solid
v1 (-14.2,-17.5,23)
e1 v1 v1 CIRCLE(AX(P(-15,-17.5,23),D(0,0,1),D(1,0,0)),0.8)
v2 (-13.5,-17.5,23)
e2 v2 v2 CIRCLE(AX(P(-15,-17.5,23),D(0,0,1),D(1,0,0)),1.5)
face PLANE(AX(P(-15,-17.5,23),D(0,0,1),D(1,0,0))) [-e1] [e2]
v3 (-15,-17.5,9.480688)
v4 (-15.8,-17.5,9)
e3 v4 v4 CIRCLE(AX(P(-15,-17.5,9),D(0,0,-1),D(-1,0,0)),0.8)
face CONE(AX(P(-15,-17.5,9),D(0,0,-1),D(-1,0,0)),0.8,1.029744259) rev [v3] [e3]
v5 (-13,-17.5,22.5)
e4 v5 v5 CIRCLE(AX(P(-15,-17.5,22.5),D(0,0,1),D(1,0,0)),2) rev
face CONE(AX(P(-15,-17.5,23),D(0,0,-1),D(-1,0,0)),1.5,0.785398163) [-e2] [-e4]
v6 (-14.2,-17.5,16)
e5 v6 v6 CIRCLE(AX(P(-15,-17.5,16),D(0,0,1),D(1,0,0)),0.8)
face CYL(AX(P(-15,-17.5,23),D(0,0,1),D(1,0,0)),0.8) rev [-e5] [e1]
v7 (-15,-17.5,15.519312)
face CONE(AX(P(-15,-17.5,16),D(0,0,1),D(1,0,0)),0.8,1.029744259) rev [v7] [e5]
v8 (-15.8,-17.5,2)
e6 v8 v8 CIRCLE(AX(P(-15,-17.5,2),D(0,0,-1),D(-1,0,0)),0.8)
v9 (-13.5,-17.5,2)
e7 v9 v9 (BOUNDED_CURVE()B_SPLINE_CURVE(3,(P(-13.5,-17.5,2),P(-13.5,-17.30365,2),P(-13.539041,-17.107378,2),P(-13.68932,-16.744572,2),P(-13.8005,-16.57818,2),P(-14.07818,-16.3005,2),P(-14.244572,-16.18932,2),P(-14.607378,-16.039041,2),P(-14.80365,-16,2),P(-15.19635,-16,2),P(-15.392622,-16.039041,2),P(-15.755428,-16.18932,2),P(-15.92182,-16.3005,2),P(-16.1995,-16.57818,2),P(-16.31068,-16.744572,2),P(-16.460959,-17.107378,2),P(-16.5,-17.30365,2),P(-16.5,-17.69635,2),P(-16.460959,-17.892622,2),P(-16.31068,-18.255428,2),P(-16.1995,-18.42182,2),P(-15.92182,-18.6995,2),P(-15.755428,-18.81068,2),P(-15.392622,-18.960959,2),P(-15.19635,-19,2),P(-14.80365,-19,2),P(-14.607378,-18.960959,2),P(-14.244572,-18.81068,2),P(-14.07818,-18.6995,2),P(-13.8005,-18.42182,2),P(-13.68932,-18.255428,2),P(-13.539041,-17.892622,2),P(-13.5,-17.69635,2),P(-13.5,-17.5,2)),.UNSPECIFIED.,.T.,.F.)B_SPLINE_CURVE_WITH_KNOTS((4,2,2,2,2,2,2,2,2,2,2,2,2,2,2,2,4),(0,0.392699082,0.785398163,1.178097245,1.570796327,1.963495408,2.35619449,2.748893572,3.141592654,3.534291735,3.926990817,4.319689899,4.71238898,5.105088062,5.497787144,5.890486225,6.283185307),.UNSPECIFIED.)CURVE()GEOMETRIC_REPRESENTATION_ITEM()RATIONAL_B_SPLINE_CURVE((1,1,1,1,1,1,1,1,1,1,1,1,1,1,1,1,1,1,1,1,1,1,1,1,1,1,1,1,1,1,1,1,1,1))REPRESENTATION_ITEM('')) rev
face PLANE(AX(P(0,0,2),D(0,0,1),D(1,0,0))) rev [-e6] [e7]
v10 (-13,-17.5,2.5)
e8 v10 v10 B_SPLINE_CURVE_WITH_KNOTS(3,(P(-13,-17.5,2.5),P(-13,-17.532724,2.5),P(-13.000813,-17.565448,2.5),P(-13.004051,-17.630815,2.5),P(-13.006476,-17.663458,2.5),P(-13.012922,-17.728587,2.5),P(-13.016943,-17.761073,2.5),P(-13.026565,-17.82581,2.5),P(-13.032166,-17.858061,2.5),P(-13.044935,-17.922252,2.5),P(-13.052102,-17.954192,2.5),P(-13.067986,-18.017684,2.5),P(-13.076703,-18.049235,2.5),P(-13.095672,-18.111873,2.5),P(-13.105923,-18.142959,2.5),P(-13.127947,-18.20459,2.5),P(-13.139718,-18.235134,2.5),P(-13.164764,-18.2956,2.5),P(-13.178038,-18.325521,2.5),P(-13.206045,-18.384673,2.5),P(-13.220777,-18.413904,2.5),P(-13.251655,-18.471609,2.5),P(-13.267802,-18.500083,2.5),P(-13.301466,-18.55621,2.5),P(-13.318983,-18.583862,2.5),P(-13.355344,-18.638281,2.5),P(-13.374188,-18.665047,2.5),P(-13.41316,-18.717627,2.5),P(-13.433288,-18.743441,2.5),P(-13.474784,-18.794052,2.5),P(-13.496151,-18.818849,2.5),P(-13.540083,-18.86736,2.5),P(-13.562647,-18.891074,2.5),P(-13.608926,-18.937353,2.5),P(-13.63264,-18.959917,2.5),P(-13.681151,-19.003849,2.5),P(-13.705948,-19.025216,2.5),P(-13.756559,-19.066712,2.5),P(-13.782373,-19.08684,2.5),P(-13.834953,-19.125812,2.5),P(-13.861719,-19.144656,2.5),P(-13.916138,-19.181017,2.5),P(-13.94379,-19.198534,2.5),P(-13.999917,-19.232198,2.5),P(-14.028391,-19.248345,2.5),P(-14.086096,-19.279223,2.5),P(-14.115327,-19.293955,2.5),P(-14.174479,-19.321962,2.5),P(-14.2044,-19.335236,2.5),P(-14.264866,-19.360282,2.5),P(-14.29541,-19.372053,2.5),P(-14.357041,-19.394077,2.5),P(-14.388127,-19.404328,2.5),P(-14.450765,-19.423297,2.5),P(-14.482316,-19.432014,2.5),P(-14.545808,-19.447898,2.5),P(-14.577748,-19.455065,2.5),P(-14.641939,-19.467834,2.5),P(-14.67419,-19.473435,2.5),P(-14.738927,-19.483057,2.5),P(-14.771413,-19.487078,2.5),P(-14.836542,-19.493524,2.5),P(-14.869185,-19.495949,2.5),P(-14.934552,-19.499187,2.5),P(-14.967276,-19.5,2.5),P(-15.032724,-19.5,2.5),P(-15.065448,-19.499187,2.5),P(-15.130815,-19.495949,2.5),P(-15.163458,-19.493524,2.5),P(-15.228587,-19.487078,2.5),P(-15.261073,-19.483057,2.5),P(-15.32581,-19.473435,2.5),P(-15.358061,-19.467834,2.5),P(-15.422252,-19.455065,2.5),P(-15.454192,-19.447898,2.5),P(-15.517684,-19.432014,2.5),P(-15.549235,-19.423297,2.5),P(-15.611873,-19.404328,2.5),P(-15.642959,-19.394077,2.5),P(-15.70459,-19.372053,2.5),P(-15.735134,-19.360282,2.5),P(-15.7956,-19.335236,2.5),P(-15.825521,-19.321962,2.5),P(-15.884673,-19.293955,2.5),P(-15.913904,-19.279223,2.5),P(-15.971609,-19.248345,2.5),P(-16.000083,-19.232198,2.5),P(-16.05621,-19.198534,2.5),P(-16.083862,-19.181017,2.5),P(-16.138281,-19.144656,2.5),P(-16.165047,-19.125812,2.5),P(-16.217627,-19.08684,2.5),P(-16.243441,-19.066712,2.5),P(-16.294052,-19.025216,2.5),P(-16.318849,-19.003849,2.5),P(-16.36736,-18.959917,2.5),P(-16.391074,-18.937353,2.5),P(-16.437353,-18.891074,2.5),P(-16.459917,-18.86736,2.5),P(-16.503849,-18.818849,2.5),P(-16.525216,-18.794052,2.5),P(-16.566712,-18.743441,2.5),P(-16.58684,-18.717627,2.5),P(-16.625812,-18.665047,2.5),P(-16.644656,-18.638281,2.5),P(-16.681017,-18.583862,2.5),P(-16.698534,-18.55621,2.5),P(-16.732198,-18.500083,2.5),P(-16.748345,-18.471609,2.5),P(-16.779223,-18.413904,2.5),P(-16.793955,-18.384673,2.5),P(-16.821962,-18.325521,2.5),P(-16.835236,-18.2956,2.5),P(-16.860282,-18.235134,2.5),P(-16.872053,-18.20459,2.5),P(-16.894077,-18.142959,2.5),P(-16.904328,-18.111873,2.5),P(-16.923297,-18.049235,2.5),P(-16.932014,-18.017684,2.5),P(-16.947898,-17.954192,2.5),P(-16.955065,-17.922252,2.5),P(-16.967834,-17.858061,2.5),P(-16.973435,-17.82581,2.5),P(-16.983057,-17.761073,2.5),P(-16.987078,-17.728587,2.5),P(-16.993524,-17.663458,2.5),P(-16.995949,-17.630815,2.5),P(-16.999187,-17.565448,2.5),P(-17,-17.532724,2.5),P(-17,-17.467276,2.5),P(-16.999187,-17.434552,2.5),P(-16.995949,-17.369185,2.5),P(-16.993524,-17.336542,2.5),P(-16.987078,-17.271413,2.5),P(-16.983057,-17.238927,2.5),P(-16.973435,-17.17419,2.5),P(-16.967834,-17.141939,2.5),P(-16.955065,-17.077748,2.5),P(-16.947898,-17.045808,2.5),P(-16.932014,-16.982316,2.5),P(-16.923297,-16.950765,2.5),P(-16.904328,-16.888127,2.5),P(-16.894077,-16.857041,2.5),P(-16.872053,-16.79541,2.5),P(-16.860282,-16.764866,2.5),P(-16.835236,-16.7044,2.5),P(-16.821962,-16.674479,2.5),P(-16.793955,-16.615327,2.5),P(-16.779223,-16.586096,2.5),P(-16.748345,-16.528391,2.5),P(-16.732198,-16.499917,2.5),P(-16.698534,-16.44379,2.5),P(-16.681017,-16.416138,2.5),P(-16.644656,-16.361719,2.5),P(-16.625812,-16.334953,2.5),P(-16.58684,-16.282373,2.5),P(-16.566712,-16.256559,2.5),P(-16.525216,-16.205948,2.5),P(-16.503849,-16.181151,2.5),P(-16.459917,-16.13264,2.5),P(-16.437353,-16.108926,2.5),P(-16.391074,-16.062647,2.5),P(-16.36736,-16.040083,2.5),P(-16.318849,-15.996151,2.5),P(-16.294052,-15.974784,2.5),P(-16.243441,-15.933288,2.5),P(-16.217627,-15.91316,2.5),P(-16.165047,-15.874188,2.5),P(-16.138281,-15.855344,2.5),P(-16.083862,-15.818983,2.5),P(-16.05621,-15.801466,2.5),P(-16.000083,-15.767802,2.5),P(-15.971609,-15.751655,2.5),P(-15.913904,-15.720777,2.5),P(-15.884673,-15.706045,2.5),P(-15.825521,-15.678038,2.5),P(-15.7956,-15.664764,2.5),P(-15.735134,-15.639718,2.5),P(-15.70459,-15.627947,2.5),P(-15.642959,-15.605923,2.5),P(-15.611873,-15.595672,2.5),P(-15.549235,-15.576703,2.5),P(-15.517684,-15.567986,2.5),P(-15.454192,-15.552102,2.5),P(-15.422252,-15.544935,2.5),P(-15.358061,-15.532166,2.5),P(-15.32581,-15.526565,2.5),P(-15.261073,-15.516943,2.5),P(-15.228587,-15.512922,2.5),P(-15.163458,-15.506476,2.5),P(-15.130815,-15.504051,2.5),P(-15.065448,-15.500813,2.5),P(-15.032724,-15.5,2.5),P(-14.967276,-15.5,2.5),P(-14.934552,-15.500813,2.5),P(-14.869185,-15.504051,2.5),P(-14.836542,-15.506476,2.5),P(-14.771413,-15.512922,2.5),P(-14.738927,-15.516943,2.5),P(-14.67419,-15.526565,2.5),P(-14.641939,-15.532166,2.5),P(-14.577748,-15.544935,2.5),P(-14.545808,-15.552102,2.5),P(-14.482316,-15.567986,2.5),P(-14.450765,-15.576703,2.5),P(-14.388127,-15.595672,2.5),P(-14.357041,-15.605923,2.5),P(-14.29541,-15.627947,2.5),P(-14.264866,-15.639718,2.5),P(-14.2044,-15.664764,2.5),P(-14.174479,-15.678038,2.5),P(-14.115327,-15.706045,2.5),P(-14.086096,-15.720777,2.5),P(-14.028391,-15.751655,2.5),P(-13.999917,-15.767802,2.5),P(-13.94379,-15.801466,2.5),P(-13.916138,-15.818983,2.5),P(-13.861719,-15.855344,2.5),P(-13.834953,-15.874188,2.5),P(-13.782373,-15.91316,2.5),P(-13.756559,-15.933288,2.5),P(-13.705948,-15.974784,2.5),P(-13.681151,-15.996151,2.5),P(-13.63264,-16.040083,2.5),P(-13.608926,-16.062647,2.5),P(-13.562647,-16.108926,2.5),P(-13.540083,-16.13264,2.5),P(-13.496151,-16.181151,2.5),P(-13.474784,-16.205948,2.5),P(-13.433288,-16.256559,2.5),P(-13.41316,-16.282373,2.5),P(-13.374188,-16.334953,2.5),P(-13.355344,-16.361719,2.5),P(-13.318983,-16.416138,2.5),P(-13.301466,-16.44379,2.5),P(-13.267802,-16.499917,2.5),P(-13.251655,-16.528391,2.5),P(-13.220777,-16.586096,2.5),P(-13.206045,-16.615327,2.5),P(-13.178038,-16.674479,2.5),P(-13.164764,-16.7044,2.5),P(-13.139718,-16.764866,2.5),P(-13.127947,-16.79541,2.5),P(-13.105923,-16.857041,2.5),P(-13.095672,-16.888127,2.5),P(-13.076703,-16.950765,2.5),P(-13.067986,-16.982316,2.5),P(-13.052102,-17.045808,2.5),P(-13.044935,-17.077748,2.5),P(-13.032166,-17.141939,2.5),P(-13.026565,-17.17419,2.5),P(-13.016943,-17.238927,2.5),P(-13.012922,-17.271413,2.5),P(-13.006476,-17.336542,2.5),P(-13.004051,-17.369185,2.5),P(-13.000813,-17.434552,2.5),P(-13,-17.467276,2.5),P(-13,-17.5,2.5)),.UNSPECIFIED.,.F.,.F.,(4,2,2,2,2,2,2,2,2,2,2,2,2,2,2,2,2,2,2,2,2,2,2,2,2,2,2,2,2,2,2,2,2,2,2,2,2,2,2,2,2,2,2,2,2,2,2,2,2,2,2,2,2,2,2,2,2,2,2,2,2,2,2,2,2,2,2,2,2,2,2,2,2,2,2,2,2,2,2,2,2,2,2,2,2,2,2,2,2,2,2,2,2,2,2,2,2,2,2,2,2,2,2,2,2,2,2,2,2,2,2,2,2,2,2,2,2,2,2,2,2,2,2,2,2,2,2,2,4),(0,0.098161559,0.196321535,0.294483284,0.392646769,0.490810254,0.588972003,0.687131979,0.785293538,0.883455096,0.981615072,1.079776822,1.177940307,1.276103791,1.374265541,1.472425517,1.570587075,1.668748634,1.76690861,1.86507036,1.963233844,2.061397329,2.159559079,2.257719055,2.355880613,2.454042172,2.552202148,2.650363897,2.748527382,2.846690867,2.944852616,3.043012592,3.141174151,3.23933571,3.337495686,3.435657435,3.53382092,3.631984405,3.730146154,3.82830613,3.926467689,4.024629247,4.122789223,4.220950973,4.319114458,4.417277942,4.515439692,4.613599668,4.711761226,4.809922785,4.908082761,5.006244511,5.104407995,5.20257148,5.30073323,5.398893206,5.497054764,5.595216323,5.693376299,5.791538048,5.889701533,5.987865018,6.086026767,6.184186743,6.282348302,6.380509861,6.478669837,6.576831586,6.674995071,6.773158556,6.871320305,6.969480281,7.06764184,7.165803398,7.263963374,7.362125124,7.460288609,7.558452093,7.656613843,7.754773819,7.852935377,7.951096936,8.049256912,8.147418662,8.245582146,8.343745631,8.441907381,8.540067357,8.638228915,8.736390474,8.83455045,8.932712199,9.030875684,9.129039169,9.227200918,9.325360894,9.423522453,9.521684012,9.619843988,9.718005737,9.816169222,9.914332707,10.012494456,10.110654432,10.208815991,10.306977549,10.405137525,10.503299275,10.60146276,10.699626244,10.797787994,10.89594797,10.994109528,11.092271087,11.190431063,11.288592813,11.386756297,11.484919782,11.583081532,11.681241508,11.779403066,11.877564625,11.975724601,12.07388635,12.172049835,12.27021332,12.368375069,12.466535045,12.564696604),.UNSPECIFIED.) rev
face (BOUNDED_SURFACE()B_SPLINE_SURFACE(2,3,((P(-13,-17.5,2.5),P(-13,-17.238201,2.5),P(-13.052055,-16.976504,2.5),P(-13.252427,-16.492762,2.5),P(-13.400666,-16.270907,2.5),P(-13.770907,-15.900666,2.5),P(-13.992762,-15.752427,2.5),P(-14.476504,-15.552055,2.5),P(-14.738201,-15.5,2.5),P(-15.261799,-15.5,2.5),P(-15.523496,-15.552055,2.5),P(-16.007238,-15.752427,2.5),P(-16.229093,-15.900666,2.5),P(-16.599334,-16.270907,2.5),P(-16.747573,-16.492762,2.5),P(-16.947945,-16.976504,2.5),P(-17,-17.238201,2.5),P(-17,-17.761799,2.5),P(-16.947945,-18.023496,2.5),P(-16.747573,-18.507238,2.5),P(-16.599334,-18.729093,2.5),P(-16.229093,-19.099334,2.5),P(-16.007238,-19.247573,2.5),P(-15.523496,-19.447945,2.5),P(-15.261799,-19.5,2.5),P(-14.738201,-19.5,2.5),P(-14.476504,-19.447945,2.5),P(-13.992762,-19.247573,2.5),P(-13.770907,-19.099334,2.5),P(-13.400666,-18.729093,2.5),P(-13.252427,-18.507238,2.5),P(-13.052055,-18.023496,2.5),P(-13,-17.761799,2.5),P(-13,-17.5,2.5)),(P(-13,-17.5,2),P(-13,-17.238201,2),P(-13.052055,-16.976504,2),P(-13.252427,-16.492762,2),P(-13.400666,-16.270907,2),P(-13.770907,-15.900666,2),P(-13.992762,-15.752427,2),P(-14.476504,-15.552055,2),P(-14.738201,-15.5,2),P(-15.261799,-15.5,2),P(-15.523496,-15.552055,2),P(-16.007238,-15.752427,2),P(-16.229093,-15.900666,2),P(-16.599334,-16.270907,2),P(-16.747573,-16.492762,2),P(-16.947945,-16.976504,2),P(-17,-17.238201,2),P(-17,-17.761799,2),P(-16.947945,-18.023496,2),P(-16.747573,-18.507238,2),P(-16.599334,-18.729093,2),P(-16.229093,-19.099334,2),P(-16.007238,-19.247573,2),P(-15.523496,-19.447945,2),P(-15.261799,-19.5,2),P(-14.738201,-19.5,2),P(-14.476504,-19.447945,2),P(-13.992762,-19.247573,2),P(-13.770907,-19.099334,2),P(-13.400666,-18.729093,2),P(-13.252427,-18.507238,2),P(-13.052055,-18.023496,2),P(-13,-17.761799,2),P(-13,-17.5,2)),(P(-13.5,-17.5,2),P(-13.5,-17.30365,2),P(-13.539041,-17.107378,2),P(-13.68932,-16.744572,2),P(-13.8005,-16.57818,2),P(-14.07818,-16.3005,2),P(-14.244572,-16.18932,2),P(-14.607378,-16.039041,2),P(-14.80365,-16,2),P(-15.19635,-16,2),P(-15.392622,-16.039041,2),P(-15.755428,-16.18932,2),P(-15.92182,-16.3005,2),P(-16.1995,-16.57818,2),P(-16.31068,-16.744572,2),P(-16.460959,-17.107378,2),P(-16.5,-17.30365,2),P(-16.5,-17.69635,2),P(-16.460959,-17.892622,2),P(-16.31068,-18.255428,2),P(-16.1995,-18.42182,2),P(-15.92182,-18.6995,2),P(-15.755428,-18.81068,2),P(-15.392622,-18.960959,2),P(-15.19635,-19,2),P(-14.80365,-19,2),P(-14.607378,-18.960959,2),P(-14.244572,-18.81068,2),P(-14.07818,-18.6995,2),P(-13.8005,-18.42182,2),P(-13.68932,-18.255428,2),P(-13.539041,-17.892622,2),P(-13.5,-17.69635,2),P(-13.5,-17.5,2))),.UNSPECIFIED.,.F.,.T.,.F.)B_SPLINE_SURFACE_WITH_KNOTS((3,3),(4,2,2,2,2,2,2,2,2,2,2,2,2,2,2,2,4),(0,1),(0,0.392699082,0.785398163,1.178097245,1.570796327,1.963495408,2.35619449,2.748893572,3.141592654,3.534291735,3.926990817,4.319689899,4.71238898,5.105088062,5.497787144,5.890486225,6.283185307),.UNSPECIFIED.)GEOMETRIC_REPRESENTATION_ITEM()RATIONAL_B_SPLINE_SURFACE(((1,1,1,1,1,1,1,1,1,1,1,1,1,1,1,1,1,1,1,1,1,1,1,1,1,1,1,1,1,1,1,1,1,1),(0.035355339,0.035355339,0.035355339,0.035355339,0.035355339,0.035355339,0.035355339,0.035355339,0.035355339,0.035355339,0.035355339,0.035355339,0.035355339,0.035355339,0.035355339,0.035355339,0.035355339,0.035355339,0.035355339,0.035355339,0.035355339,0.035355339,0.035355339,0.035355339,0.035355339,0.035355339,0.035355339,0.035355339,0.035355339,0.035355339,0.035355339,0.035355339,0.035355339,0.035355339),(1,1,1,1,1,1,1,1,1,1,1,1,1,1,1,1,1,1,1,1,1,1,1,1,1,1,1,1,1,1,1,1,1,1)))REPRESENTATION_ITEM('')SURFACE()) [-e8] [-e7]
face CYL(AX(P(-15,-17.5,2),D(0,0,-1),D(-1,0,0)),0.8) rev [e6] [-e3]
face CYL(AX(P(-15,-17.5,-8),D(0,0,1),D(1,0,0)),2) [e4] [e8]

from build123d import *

# Parameters (mm, degrees)
SKETCH_2_W             = 38
SKETCH_2_H             = 39
EXTRUDE_1_DEPTH        = 2
CHAMFER_3_SIZE         = 1
SKETCH_7_R             = 4.25
CUT_EXTRUDE_3_DEPTH    = 10
SKETCH_8_W             = 2
SKETCH_8_H             = 39
CUT_EXTRUDE_4_DEPTH    = 10
FILLET_3_R             = 2
SKETCH_9_R             = 2
EXTRUDE_1_2_DEPTH      = 21
SKETCH_10_W            = 3
SKETCH_10_H            = 39
CUT_EXTRUDE_1_DEPTH    = 10
FILLET_5_R             = 2
CHAMFER_5_SIZE         = 0.5
HOLE_WIZARD_M2_5_3_D   = 2.05
HOLE_WIZARD_M2_1_D     = 1.6
HOLE_WIZARD_M2_1_DEPTH = 7
HOLE_WIZARD_M2_1_TIP   = 0.480688495
CUT_EXTRUDE_2_DEPTH    = 10
SKETCH_24_W            = 71.290640242
SKETCH_24_H            = 51.144653494
CUT_EXTRUDE_3_2_DEPTH  = 10
SKETCH_25_R            = 6.539265834
CUT_EXTRUDE_4_2_DEPTH  = 32
HOLE_WIZARD_M2_2_D     = 1.6
HOLE_WIZARD_M2_2_DEPTH = 7
HOLE_WIZARD_M2_2_TIP   = 0.480688495
FILLET_6_SIZE          = 0.5


with BuildPart() as part:
    # 草图2 → Extrude 1 (new body)
    with BuildSketch(Plane.XY):
        Rectangle(SKETCH_2_W, SKETCH_2_H)
    extrude(amount=EXTRUDE_1_DEPTH)

    # 倒角3
    chamfer_3_edges = [part.edges().sort_by_distance(p)[0] for p in [
        (-19, 19.5, 1),
        (-19, -19.5, 1),
    ]]
    chamfer(chamfer_3_edges, length=CHAMFER_3_SIZE)

    # 草图7 → Cut-Extrude 3 (cut)
    with BuildSketch(Plane.XY.offset(2)):
        with Locations((2, 0)):
            Circle(SKETCH_7_R)
    extrude(amount=-CUT_EXTRUDE_3_DEPTH, mode=Mode.SUBTRACT)

    # 草图8 → Cut-Extrude 4 (cut)
    with BuildSketch(Plane.XY.offset(2)):
        with Locations((-18, 0)):
            Rectangle(SKETCH_8_W, SKETCH_8_H)
    extrude(amount=-CUT_EXTRUDE_4_DEPTH, mode=Mode.SUBTRACT)

    # 圆角3
    fillet_3_edges = [part.edges().sort_by_distance(p)[0] for p in [
        (-17, 19.5, 1),
        (-17, -19.5, 1),
    ]]
    fillet(fillet_3_edges, radius=FILLET_3_R)

    # 草图9 → Extrude 1 2 (add)
    with BuildSketch(Plane.XY.offset(2)):
        with Locations((-15, 17.5)):
            Circle(SKETCH_9_R)
        with Locations((-15, -17.5)):
            Circle(SKETCH_9_R)
    extrude_1_2 = extrude(amount=EXTRUDE_1_2_DEPTH)

    # 镜向1: Extrude 1 2 across plane
    add(extrude_1_2.mirror(Plane.ZX))

    # 草图10 → 切除-拉伸1 (cut)
    with BuildSketch(Plane(origin=(0, 0, 0), x_dir=(-1, 0, 0), z_dir=(0, 0, -1))):
        with Locations((-17.5, 0)):
            Rectangle(SKETCH_10_W, SKETCH_10_H)
    extrude(amount=-CUT_EXTRUDE_1_DEPTH, mode=Mode.SUBTRACT)

    # 圆角5
    fillet_5_edges = [part.edges().sort_by_distance(p)[0] for p in [
        (16, -19.5, 1),
        (16, 19.5, 1),
    ]]
    fillet(fillet_5_edges, radius=FILLET_5_R)

    # 倒角5
    chamfer_5_edges = [part.edges().sort_by_distance(p)[0] for p in [
        (-17, -17.5, 23),
        (-17, 17.5, 23),
        (15.414213562, 18.914213562, 0),
        (16, 0, 0),
        (-0.5, 19.5, 0),
        (15.414213562, -18.914213562, 0),
        (-16.414213562, 18.914213562, 0),
        (-0.5, -19.5, 0),
        (-17, 0, 0),
        (-16.414213562, -18.914213562, 0),
    ]]
    chamfer(chamfer_5_edges, length=CHAMFER_5_SIZE)

    # M2.5 螺纹孔3 (through all)
    with Locations(Plane(origin=(9.5, 15.5, 0), x_dir=(-1, 0, 0), z_dir=(0, 0, -1))):
        with Locations((0, 0), (15, 0), (0, -31), (15, -31)):
            Hole(HOLE_WIZARD_M2_5_3_D / 2)

    # M2 螺纹孔1
    with Locations(Plane(origin=(-15, 17.5, 23), x_dir=(1, 0, 0), z_dir=(0, 0, 1))):
        with Locations((0, 0), (0, -35)):
            Hole(HOLE_WIZARD_M2_1_D / 2, depth=HOLE_WIZARD_M2_1_DEPTH)
            with Locations((0, 0, -(HOLE_WIZARD_M2_1_DEPTH + HOLE_WIZARD_M2_1_TIP / 2))):  # 118° drill point
                Cone(0, HOLE_WIZARD_M2_1_D / 2, HOLE_WIZARD_M2_1_TIP, mode=Mode.SUBTRACT)

    # 草图23 → 切除-拉伸2 (cut)
    with BuildSketch(Plane(origin=(0, 0, 0), x_dir=(-1, 0, 0), z_dir=(0, 0, -1))):
        with BuildLine():
            Line((-0.95, 16.2), (-0.95, 9.8))
            ThreePointArc((-0.95, 9.8), (-2, 8.75), (-3.05, 9.8))
            Line((-3.05, 9.8), (-3.05, 16.2))
            ThreePointArc((-3.05, 16.2), (-2, 17.25), (-0.95, 16.2))
        make_face()
    cut_extrude_2 = extrude(amount=-CUT_EXTRUDE_2_DEPTH, mode=Mode.SUBTRACT)

    # 镜向2: 切除-拉伸2 across plane
    add(cut_extrude_2.mirror(Plane.ZX), mode=Mode.SUBTRACT)

    # 草图24 → Cut-Extrude 3 2 (cut)
    with BuildSketch(Plane.XY.offset(2)):
        Rectangle(SKETCH_24_W, SKETCH_24_H)
    extrude(amount=-CUT_EXTRUDE_3_2_DEPTH, mode=Mode.SUBTRACT)


with BuildPart() as cut_extrude_3_2_piece_1:
    # of the separate pieces the step leaves, piece 1, a body of its own (cut_extrude_3_2_pieces)
    add(part.part.solids().sort_by_distance((-13, 17.5, 22.5))[0])

    # 草图25 → Cut-Extrude 4 2 (cut)
    with BuildSketch(Plane(origin=(0, 0, 2), x_dir=(-1, 0, 0), z_dir=(0, 0, -1))):
        with Locations((15, 17.5)):
            Circle(SKETCH_25_R)
    extrude(amount=-CUT_EXTRUDE_4_2_DEPTH, mode=Mode.SUBTRACT)


with BuildPart() as cut_extrude_3_2_piece_2:
    # of the separate pieces the step leaves, piece 2, a body of its own (cut_extrude_3_2_pieces)
    add(part.part.solids().sort_by_distance((-13, -17.5, 2))[0])

    # M2 螺纹孔2
    with Locations(Plane(origin=(-15, -17.5, 2), x_dir=(-1, 0, 0), z_dir=(0, 0, -1))):
        with Locations((0, 0)):
            Hole(HOLE_WIZARD_M2_2_D / 2, depth=HOLE_WIZARD_M2_2_DEPTH)
            with Locations((0, 0, -(HOLE_WIZARD_M2_2_DEPTH + HOLE_WIZARD_M2_2_TIP / 2))):  # 118° drill point
                Cone(0, HOLE_WIZARD_M2_2_D / 2, HOLE_WIZARD_M2_2_TIP, mode=Mode.SUBTRACT)

    # 圆角6
    # a fillet whose section is not a circle: 0.5 mm, written as the material it takes off along each edge
    with BuildSketch(Plane(origin=(-15, -17.5, 2), x_dir=(1, 0, 0), z_dir=(0, -1, 0))) as fillet_6_piece_1:
        with BuildLine():
            Bezier((2, FILLET_6_SIZE), (2, 0), (2 - FILLET_6_SIZE, 0), weights=[1, 0.035355339, 1])
            Line((2 - FILLET_6_SIZE, 0), (2, 0))
            Line((2, 0), (2, FILLET_6_SIZE))
        make_face()
    revolve(axis=Axis((-15, -17.5, 2), (0, 0, 1)), mode=Mode.SUBTRACT)


solid = cut_extrude_3_2_piece_2.part
